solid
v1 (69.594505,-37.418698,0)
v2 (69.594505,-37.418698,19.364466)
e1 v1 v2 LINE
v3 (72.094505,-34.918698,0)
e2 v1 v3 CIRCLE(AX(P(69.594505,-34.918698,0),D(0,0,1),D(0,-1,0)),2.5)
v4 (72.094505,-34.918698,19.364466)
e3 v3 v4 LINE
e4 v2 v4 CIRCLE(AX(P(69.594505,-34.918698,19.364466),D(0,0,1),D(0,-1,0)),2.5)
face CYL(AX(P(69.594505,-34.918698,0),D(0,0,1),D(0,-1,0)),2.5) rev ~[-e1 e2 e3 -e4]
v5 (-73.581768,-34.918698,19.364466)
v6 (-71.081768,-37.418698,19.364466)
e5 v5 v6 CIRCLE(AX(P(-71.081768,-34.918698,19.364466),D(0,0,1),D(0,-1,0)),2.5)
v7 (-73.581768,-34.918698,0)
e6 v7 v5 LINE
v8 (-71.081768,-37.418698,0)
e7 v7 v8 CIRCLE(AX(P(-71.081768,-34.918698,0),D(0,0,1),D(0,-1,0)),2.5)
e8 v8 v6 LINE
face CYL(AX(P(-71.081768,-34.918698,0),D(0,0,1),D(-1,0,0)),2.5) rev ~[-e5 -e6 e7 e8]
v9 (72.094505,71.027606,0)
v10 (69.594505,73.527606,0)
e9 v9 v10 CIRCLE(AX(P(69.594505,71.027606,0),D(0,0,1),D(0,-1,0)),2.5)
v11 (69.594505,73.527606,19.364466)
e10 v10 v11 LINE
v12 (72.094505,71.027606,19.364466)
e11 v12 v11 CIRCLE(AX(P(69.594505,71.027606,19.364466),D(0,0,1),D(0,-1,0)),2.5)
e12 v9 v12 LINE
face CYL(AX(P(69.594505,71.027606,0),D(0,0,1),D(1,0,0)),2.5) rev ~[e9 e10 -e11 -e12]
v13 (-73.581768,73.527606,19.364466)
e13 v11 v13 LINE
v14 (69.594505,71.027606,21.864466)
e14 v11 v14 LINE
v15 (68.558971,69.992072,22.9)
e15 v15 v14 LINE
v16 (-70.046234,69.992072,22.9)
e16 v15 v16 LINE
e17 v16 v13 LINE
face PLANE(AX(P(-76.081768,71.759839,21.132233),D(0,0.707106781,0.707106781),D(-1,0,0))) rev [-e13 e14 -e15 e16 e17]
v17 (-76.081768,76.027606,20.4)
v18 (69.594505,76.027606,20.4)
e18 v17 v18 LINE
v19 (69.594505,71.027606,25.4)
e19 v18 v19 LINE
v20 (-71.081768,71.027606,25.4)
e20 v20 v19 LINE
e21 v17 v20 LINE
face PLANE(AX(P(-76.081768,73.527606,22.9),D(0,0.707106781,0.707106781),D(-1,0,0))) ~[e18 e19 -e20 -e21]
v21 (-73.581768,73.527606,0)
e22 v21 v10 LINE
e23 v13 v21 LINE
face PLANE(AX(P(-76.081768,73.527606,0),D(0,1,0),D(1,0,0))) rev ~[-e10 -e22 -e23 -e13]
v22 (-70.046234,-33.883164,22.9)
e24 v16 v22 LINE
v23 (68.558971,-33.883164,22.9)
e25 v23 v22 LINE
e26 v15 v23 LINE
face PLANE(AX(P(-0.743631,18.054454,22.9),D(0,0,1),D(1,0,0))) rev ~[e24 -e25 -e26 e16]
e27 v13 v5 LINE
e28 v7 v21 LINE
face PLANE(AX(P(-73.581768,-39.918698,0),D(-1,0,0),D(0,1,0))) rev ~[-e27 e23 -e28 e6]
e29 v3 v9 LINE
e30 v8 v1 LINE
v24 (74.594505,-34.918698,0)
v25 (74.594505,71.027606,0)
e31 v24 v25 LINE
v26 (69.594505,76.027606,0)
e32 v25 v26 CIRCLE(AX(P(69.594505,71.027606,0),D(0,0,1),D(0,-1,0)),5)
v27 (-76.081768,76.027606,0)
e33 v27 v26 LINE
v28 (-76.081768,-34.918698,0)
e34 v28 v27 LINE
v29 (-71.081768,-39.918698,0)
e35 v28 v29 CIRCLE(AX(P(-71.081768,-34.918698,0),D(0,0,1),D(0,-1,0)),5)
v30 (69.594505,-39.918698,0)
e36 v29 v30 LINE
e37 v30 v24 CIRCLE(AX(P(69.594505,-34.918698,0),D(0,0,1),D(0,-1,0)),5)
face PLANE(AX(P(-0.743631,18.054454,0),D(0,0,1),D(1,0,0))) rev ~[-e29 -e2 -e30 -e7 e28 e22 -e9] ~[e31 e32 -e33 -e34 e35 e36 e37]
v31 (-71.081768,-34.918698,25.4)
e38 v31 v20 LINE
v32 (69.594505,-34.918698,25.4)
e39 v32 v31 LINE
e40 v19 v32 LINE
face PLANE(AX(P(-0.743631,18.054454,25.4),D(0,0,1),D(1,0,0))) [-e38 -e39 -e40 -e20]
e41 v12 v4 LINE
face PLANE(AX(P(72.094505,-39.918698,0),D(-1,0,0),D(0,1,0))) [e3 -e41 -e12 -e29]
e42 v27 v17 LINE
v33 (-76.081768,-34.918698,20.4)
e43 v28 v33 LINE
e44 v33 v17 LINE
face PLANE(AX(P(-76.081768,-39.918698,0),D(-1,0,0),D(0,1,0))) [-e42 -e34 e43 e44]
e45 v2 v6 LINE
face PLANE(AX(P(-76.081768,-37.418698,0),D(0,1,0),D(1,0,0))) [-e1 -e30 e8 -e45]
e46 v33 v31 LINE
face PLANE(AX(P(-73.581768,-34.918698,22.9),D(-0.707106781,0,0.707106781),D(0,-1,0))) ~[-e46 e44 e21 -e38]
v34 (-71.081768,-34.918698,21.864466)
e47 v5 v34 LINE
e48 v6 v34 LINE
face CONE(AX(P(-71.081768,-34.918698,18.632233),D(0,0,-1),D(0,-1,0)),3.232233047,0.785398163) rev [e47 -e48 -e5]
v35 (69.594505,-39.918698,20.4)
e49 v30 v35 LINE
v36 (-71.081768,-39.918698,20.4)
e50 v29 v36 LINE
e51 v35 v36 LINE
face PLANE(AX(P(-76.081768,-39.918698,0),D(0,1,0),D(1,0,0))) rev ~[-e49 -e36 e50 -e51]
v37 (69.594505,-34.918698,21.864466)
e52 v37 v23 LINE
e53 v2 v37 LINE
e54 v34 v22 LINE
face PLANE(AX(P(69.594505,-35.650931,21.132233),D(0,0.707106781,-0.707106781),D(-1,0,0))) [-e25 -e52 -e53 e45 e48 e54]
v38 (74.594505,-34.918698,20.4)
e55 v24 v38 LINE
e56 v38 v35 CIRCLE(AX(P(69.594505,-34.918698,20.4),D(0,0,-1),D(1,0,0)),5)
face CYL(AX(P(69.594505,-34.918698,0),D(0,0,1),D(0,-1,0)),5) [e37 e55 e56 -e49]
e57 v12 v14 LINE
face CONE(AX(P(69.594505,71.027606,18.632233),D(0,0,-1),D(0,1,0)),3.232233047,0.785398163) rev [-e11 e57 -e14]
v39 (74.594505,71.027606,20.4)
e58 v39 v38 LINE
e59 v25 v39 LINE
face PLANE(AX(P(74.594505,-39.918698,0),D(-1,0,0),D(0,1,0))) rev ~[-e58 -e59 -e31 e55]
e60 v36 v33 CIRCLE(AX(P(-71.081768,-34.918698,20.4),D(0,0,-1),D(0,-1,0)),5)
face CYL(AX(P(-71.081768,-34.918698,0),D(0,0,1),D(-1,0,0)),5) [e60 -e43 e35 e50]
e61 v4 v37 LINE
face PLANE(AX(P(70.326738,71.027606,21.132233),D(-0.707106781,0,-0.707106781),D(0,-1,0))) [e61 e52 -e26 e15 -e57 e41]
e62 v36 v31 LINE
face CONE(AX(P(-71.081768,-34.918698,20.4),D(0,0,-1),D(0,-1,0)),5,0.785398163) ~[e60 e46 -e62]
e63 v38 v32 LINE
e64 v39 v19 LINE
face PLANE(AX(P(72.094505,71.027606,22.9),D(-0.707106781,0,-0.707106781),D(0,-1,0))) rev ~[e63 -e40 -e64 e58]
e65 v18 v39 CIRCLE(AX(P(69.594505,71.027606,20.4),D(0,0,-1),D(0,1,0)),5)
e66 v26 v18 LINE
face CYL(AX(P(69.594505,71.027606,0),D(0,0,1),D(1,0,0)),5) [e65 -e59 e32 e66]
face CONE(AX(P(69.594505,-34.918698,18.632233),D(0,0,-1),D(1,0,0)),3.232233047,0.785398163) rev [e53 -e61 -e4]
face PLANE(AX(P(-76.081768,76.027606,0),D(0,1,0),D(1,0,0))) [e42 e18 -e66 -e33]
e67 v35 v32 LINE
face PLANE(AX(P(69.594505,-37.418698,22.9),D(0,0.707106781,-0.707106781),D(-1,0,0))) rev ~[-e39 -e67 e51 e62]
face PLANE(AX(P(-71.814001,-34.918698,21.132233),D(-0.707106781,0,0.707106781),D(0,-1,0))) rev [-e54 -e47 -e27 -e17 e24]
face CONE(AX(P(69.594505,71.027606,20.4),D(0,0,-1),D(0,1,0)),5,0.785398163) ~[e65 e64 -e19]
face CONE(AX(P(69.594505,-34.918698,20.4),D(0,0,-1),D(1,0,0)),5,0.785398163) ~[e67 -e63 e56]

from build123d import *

# Parameters (mm, degrees)
F0_W     = 150.6762728095
F0_H     = 115.9463040531
F1_DEPTH = 25.4
F2_R     = 5
F3_SIZE  = 5
F4_T     = 2.5


# Not quite as in the source:
# - a shell that OpenCascade refuses in one call is made with other operations: the cavity is built on its own and cut out


with BuildPart() as f1:
    # F0 (on Top) → F1 (new body)
    with BuildSketch(Plane.XY):
        with Locations((-0.7436312735, 18.0544536561)):
            Rectangle(F0_W, F0_H)
    extrude(amount=F1_DEPTH)

    # F2
    f2_edges = [f1.edges().sort_by_distance(p)[0] for p in [
        (-76.081768, -39.918698, 12.7),
        (74.594505, -39.918698, 12.7),
        (74.594505, 76.027606, 12.7),
    ]]
    fillet(f2_edges, radius=F2_R)

    # F3
    f3_edges = [f1.edges().sort_by_distance(p)[0] for p in [
        (-76.081768, 20.554454, 25.4),
        (-74.617302, -38.454232, 25.4),
        (-3.243631, 76.027606, 25.4),
        (-0.743631, -39.918698, 25.4),
        (73.130039, 74.56314, 25.4),
        (73.130039, -38.454232, 25.4),
        (74.594505, 18.054454, 25.4),
    ]]
    chamfer(f3_edges, length=F3_SIZE)

    # F4: shell of thickness 2.5, made by hand


with BuildPart() as f4_core1:
    # F4_t2: copy of F1
    add(f1.part)

    # the walls: a layer under each face that stays
    f4_faces = [f4_core1.faces().sort_by_distance(p)[0] for p in [
        (-76.0817676783, 20.5544536561, 10.2),
        (-74.6173015842, -38.4542322764, 10.2),
        (-73.5817676783, 20.5544536561, 22.9),
        (-3.2436312735, 76.0276056826, 10.2),
        (-72.8495346312, -36.6864653234, 22.9),
        (-0.7436312735, -39.9186983705, 10.2),
        (-3.2436312735, 73.5276056826, 22.9),
        (-0.7436312735, 18.0544536561, 25.4),
        (73.1300390372, 74.5631395885, 10.2),
        (73.1300390372, -38.4542322764, 10.2),
        (74.5945051312, 18.0544536561, 10.2),
        (-0.7436312735, -37.4186983705, 22.9),
        (71.3622720842, 72.7953726356, 22.9),
        (72.0945051312, 18.0544536561, 22.9),
        (71.3622720842, -36.6864653234, 22.9),
    ]]
    thicken(f4_faces, amount=-F4_T, mode=Mode.SUBTRACT)


with BuildPart() as f1_1:
    add(f1.part)

    # what is left inside the walls is the cavity
    f4_cavity = [f4_core1.part.solids().sort_by_distance(p)[0] for p in [
        (-0.743631, -0.436597, 0.025),
    ]]
    add(f4_cavity, mode=Mode.SUBTRACT)


solid = f1_1.part
